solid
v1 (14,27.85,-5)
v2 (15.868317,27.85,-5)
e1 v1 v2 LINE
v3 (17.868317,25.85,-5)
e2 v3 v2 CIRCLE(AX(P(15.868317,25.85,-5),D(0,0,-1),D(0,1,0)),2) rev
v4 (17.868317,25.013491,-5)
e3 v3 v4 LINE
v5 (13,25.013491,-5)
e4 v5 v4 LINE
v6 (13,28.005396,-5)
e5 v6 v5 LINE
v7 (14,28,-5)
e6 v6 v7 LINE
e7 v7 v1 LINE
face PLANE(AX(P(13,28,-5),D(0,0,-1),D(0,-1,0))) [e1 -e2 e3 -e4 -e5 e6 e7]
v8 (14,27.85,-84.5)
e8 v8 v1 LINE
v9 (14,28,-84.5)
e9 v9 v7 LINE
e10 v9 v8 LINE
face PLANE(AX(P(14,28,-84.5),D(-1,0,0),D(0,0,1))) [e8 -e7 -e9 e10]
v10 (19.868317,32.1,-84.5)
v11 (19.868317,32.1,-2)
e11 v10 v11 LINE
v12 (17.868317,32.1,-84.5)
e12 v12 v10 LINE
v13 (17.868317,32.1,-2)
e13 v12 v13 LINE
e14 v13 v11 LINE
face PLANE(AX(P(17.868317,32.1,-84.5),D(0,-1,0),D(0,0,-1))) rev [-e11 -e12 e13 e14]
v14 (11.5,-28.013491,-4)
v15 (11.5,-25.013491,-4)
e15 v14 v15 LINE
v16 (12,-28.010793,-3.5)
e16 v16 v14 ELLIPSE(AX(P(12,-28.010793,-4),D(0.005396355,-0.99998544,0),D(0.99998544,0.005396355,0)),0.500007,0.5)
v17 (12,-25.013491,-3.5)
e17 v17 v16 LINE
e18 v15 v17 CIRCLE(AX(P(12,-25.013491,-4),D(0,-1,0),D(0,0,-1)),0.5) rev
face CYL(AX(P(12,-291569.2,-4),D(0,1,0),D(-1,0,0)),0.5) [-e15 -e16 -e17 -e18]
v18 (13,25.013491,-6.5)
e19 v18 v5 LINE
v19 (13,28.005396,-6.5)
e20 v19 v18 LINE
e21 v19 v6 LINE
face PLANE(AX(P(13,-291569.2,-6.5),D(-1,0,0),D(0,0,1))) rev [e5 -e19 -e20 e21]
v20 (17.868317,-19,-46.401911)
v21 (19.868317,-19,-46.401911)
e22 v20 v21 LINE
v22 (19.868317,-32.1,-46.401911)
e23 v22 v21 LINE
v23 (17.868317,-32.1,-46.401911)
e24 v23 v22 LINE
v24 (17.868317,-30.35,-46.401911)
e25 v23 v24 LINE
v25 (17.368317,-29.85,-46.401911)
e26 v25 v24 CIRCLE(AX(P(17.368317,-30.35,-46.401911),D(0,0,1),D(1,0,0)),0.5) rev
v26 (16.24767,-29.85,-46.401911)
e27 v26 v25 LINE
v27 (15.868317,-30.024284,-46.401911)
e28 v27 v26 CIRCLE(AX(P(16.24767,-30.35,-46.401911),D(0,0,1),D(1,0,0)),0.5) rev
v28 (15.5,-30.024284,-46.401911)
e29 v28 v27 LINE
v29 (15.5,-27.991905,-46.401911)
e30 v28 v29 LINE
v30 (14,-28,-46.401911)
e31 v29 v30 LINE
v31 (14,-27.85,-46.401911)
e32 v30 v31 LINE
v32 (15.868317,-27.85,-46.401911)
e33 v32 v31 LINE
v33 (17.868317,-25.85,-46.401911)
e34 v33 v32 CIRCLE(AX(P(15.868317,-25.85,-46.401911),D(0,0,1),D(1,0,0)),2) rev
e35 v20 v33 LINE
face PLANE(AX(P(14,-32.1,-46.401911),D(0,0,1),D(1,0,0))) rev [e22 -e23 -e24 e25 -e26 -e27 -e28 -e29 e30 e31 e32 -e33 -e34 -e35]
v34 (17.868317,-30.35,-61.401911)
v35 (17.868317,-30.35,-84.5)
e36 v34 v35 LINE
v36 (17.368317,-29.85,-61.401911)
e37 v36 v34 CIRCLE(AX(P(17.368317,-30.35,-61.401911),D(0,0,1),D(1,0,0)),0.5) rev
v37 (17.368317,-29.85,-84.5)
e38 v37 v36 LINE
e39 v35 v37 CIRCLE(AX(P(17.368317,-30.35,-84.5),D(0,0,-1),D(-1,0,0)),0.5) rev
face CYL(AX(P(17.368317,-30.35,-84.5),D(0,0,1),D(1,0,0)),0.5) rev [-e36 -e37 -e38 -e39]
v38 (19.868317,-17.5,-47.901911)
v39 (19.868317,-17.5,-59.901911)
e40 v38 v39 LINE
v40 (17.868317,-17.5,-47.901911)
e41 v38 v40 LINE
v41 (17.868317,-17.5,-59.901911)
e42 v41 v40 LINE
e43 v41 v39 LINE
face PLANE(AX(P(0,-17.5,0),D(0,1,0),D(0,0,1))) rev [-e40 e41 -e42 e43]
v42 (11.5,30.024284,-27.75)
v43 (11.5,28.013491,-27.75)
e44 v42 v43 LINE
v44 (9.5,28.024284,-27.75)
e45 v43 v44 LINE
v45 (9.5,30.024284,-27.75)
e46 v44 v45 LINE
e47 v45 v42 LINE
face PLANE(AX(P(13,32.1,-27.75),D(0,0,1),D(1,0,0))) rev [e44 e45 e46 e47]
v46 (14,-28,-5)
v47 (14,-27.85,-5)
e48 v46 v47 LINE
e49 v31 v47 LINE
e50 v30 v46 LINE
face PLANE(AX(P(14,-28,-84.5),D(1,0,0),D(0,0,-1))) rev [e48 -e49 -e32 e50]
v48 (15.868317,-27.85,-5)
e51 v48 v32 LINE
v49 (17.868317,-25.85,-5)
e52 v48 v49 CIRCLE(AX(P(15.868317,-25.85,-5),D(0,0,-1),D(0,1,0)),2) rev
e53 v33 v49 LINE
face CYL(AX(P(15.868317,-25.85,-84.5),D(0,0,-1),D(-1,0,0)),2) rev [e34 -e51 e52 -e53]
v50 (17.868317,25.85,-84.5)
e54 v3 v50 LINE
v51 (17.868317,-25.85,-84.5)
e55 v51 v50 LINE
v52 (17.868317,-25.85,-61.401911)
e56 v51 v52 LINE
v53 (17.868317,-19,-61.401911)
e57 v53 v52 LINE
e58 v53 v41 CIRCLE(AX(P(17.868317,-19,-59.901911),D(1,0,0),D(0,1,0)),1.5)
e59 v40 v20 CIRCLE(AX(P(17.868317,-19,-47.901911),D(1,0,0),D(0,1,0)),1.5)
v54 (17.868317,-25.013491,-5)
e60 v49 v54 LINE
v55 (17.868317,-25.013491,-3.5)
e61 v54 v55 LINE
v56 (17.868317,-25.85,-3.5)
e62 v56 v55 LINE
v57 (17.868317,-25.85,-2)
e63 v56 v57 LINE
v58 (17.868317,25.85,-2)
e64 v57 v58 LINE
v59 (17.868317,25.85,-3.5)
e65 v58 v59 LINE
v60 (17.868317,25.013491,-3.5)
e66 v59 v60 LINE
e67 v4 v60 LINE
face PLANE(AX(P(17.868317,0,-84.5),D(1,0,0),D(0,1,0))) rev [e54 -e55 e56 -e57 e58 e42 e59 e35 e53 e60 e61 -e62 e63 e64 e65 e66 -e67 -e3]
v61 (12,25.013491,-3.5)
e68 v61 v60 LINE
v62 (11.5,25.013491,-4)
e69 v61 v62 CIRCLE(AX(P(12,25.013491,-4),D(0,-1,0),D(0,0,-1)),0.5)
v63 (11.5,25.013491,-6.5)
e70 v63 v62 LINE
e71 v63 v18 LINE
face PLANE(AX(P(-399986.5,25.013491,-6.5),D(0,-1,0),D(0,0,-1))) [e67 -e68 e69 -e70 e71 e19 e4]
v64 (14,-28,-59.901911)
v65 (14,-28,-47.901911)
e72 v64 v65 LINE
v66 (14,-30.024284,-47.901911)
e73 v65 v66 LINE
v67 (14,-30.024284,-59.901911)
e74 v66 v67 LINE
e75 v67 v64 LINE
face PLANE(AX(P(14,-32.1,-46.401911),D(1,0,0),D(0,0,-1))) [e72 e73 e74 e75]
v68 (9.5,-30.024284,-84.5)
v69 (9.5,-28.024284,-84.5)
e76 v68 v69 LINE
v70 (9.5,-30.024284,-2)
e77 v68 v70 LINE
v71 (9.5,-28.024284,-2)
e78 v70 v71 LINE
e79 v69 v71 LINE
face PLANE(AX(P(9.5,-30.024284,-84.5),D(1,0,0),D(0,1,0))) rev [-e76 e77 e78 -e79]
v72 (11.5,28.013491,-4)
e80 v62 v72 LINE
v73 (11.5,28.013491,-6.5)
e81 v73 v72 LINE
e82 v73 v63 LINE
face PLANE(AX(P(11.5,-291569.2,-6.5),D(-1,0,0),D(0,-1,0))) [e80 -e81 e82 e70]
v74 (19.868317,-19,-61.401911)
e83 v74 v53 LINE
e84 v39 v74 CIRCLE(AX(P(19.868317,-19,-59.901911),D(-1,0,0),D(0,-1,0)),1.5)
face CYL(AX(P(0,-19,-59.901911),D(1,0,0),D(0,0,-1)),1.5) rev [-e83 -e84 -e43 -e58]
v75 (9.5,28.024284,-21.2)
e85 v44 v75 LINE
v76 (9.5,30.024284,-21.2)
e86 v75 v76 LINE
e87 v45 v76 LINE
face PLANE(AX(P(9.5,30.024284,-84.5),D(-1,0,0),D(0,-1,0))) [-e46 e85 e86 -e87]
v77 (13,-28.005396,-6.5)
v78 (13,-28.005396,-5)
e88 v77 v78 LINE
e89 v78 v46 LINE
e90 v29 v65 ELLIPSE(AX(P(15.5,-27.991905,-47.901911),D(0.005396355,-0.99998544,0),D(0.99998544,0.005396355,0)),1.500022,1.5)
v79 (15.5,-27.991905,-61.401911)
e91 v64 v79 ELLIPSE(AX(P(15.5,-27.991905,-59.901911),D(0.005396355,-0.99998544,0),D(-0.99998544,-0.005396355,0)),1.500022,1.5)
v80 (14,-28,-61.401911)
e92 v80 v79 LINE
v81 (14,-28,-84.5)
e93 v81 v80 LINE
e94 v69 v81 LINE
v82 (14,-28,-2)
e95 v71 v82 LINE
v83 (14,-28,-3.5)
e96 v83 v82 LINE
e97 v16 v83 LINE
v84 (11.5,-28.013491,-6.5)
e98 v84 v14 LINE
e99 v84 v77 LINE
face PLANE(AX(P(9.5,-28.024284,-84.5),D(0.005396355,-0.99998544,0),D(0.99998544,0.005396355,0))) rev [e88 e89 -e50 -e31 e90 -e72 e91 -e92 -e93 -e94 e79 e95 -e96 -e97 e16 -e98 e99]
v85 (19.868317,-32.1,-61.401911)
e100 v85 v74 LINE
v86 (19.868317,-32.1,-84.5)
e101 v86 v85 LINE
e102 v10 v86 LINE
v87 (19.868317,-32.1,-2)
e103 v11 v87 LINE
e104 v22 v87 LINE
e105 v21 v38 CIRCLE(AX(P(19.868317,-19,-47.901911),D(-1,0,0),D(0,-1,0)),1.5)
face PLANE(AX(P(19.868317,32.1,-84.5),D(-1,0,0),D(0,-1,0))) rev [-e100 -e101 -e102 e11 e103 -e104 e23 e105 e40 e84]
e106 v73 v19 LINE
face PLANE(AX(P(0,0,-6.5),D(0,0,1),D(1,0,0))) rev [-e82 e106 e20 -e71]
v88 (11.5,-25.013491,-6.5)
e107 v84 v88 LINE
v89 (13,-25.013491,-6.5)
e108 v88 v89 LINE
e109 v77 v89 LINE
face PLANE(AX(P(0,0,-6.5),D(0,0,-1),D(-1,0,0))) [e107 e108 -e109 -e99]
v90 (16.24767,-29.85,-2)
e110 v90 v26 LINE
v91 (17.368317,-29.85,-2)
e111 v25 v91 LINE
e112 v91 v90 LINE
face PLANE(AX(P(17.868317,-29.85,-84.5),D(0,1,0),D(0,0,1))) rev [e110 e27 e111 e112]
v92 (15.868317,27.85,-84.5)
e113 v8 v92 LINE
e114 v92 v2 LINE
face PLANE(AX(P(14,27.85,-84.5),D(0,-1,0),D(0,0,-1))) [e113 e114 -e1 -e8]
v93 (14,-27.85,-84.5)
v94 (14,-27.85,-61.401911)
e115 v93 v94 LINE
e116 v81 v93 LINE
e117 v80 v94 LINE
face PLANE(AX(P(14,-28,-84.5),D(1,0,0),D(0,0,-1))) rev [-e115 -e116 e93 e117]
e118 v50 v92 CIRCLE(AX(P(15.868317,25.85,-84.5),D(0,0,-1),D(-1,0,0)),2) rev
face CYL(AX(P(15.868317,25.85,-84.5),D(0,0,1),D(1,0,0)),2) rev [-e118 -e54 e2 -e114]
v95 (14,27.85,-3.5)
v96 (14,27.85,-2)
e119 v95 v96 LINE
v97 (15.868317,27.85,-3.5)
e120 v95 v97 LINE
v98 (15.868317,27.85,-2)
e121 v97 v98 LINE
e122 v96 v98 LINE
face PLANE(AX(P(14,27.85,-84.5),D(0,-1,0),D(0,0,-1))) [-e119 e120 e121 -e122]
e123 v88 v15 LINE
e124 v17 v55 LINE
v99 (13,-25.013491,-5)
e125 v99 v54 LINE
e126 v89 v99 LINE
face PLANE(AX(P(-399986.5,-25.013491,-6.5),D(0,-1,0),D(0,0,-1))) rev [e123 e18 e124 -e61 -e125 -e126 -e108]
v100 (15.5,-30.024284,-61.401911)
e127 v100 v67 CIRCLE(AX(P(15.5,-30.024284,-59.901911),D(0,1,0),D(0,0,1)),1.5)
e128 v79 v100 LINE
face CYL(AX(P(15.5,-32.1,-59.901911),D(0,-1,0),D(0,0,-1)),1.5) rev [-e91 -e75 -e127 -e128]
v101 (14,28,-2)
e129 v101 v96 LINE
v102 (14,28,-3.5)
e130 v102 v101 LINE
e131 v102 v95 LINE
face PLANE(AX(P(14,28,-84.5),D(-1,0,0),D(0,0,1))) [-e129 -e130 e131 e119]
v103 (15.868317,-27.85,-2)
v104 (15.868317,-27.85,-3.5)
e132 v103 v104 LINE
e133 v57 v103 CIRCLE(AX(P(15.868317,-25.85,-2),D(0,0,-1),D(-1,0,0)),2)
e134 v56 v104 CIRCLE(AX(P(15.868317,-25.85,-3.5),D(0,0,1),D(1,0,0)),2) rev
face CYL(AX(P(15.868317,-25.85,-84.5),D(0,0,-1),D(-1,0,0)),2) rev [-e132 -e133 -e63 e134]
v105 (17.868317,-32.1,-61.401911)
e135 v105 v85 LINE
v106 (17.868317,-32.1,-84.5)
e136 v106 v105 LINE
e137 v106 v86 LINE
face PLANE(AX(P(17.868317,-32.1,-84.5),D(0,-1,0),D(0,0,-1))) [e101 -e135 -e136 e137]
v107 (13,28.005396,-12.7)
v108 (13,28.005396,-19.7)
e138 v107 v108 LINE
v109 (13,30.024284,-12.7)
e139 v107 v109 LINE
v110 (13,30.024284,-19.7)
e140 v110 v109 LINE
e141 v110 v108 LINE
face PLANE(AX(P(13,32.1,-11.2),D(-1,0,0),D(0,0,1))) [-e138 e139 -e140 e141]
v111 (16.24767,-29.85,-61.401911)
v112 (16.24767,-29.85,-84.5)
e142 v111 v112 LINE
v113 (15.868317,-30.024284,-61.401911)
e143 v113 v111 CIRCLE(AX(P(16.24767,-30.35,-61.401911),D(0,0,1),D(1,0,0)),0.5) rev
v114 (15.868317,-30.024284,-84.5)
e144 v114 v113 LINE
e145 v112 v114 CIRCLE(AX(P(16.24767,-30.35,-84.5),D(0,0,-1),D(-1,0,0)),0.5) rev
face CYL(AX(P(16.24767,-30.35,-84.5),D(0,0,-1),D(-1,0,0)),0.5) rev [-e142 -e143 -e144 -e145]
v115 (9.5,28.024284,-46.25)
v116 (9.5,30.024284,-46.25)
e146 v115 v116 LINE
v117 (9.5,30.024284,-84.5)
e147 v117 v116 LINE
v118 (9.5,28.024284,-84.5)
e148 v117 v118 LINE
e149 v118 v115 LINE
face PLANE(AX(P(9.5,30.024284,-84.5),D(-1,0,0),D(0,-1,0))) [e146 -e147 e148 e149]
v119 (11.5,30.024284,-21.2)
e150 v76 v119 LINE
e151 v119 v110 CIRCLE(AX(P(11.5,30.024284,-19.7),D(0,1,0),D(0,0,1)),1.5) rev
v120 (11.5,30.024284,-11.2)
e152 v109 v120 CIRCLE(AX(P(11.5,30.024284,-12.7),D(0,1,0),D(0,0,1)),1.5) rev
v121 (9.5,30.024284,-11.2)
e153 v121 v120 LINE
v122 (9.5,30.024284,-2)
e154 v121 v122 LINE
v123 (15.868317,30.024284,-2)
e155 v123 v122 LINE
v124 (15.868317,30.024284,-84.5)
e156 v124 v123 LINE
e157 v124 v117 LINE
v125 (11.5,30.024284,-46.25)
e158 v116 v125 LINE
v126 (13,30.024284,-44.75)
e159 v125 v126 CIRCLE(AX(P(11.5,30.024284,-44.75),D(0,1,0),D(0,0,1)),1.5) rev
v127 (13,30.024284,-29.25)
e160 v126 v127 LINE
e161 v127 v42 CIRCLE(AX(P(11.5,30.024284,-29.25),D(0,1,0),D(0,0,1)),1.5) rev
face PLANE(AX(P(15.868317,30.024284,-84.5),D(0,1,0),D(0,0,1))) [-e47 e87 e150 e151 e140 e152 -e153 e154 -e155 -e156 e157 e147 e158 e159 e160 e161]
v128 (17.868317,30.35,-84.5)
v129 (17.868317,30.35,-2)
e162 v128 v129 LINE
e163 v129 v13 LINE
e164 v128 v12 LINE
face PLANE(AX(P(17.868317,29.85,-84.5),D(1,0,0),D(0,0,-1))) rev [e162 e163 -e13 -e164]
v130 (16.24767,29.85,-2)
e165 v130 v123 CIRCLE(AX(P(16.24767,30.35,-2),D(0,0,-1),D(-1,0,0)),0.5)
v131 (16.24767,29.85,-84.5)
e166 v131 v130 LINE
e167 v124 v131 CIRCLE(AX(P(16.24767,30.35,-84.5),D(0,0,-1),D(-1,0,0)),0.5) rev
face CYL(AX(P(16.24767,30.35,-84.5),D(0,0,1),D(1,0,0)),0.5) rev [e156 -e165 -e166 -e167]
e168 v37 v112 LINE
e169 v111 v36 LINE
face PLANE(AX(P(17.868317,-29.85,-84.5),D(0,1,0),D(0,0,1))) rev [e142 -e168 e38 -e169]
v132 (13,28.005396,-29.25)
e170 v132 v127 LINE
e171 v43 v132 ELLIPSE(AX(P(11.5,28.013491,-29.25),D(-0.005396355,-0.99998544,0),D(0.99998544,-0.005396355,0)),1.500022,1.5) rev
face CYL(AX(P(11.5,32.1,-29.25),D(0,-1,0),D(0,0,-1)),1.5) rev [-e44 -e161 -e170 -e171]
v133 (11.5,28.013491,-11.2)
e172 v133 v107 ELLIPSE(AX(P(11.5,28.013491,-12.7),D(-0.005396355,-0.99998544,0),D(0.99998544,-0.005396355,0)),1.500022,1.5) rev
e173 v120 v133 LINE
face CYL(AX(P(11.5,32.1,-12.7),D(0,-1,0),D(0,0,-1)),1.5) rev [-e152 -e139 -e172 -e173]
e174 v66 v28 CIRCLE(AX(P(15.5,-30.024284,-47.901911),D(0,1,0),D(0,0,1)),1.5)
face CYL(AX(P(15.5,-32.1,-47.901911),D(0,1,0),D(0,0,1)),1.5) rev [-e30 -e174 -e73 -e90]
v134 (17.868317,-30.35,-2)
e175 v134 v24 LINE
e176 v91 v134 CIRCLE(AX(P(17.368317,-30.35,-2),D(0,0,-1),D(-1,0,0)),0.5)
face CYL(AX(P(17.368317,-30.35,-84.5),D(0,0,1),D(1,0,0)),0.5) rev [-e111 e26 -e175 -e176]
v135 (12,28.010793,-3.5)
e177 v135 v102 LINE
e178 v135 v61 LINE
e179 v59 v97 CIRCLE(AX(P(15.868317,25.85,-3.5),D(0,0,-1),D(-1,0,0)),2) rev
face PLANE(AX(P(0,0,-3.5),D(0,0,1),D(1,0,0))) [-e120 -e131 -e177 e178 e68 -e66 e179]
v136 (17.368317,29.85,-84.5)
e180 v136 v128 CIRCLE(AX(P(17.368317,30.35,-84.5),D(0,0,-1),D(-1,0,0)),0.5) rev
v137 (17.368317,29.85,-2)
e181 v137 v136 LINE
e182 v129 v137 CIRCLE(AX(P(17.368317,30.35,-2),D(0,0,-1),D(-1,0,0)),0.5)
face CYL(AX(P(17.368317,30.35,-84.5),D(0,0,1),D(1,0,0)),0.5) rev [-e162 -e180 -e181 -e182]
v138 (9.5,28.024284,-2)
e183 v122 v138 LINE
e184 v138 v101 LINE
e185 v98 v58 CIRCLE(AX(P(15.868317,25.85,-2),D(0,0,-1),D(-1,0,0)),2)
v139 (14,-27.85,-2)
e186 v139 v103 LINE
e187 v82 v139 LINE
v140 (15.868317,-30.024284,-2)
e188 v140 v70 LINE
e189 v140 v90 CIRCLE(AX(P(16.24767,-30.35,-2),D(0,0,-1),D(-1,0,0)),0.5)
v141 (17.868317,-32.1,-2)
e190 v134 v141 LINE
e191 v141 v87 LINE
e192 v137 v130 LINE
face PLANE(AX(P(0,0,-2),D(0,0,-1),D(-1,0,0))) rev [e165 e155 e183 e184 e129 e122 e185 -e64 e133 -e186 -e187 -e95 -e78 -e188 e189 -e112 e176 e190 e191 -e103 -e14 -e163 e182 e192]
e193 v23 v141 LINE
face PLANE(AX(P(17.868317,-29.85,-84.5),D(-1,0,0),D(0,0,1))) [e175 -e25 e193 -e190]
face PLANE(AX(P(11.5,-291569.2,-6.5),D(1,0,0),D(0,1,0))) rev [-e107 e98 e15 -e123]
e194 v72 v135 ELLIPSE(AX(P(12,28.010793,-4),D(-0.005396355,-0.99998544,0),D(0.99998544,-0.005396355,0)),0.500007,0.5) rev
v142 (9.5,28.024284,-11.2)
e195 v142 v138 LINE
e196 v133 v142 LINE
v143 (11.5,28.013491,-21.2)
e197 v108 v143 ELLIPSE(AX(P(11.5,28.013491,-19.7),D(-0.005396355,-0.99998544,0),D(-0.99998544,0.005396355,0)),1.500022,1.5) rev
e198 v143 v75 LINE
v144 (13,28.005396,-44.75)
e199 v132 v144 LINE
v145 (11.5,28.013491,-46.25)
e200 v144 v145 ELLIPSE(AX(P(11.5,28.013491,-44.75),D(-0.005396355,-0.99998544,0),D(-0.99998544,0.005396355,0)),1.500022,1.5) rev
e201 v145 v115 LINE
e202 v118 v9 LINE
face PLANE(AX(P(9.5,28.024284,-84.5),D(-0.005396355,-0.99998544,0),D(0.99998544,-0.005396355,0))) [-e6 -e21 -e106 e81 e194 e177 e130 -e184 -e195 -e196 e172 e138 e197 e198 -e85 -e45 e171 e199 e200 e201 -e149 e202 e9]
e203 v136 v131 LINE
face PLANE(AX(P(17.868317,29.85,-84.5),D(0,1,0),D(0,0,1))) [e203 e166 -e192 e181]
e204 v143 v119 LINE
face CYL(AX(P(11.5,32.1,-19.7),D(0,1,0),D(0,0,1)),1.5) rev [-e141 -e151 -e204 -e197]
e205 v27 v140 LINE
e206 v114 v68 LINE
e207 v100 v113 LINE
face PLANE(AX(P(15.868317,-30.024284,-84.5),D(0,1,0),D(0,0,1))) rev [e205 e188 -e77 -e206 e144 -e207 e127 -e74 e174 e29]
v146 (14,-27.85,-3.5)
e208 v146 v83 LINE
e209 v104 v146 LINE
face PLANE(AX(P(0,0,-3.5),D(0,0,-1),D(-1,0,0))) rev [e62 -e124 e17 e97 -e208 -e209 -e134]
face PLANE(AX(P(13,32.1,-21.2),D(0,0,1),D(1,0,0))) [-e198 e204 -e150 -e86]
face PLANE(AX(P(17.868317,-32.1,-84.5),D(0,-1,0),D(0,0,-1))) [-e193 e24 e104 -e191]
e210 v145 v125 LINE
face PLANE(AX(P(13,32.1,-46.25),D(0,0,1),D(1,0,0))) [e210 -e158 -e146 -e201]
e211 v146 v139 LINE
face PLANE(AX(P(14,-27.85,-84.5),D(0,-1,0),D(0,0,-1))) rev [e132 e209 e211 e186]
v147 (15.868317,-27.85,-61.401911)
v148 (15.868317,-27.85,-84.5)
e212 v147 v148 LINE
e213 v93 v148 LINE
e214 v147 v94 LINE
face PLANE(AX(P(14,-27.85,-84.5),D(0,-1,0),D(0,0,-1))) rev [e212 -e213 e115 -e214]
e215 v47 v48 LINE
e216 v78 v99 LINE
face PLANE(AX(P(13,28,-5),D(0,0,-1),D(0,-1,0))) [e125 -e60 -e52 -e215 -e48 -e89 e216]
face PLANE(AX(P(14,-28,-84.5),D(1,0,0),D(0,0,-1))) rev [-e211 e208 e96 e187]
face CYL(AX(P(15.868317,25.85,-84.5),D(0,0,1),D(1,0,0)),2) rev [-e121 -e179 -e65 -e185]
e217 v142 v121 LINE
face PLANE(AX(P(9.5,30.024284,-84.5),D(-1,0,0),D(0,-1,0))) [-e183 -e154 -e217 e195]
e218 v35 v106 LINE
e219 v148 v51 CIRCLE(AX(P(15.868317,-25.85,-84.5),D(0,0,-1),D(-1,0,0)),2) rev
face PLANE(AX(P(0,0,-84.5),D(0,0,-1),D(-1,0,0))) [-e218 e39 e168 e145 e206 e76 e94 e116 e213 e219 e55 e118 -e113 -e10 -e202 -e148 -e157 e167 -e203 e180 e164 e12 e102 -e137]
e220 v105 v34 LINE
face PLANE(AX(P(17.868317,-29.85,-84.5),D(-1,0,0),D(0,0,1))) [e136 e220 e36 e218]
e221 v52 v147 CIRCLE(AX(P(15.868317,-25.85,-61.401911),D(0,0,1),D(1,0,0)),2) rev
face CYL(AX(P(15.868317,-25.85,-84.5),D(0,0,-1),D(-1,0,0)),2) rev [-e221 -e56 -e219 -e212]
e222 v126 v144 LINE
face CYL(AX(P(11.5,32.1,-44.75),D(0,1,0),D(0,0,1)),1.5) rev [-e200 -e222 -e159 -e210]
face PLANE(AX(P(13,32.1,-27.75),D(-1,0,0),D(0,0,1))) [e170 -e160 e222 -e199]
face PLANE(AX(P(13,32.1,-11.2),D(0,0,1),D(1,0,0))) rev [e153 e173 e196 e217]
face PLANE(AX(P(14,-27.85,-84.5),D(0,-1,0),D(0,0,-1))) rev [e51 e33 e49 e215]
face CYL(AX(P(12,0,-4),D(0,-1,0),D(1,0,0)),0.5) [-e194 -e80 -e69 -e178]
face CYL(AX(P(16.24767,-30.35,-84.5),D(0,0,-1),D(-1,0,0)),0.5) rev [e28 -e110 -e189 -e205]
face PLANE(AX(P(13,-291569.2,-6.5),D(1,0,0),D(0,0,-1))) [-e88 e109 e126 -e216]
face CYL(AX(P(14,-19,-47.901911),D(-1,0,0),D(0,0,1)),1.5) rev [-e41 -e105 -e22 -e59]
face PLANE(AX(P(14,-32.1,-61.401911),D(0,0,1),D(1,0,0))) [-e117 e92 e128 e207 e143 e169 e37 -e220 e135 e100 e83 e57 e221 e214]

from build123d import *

# Parameters (mm, degrees)
BOSS_EXTRUDE1_START  = -82.5
BOSS_EXTRUDE1_DEPTH  = 82.5
SKETCH2_W            = 8.569638255
SKETCH2_H            = 10
SKETCH2_H_2          = 18.5
CUT_EXTRUDE1_DEPTH   = 93.549500309
FILLET2_R            = 2
FILLET3_R            = 0.5
CUT_EXTRUDE2_START   = -17.5
SKETCH2_3_W          = 11.636747081
SKETCH2_3_H          = 15
CUT_EXTRUDE2_DEPTH   = 76.049500309
FILLET1_R            = 1.5
BOSS_EXTRUDE3_START  = -3.5
BOSS_EXTRUDE3_DEPTH  = 3
BOSS_EXTRUDE4_START  = -5
BOSS_EXTRUDE4_DEPTH  = 1.5
FILLET5_R            = 0.5
FILLET5_OF_MIRROR4_R = 0.5


# Read off the part's stored shape, not the designer's step: Boss-Extrude1
with BuildPart() as part:
    # Boss-Extrude1 outline → Boss-Extrude1 (new body)
    with BuildSketch(Plane.XY.offset(-2).offset(BOSS_EXTRUDE1_START)):
        Polygon((17.868316672, 32.1), (17.868316672, 29.85), (15.868316672, 29.85), (15.868316672, 30.024283949), (9.5, 30.024283949), (9.5, 28.024283949), (14, 28), (14, 27.85), (17.868316672, 27.85), (17.868316672, 0), (19.868316672, 0), (19.868316672, 32.1), align=None)
    boss_extrude1 = extrude(amount=BOSS_EXTRUDE1_DEPTH)

    # Mirror1: Boss-Extrude1 across plane
    add(boss_extrude1.mirror(Plane.ZX))

    # Sketch2 → Cut-Extrude1 (cut, through all)
    with BuildSketch(Plane(origin=(0, 0, 0), x_dir=(1, 0, 0), z_dir=(0, 1, 0))):
        with Locations((8.715180872, 16.2)):
            Rectangle(SKETCH2_W, SKETCH2_H)
        with Locations((8.715180872, 37)):
            Rectangle(SKETCH2_W, SKETCH2_H_2)
    extrude(amount=CUT_EXTRUDE1_DEPTH, mode=Mode.SUBTRACT)

    # Fillet2
    fillet2_edges = [part.edges().sort_by_distance(p)[0] for p in [
        (17.868316672, 27.85, -43.25),
        (17.868316672, -27.85, -43.25),
    ]]
    fillet(fillet2_edges, radius=FILLET2_R)

    # Fillet3
    # the kernel refuses this fillet: 0.5 mm, written as the material it adds along each edge
    with BuildSketch(Plane(origin=(15.868316672, -29.85, -84.5), x_dir=(0, -1, 0), z_dir=(0, 0, 1))) as fillet3_piece_1:
        with BuildLine():
            CenterArc((0.5, 0.379353469), FILLET3_R, 180, 49.350336553)
            Line((0, 0.379353469), (-0.01, 0.379353469))
            Line((-0.01, 0.379353469), (-0.01, 0))
            Line((-0.01, 0), (0, -0.01))
            ThreePointArc((0, -0.01), (0.087141974, -0.01), (0.167769628, -0.007587069))
            Line((0.167769628, -0.007587069), (0.174283949, 0))
        make_face()
    extrude(amount=82.5)
    with BuildSketch(Plane(origin=(17.868316672, -29.85, -84.5), x_dir=(-1, 0, 0), z_dir=(0, 0, 1))) as fillet3_piece_2:
        with BuildLine():
            CenterArc((FILLET3_R, FILLET3_R), FILLET3_R, 180, 90)
            Line((0, FILLET3_R), (-FILLET3_R * 0.02, FILLET3_R))
            Line((-FILLET3_R * 0.02, FILLET3_R), (-FILLET3_R * 0.02, -FILLET3_R * 0.02))
            Line((-FILLET3_R * 0.02, -FILLET3_R * 0.02), (FILLET3_R, -FILLET3_R * 0.02))
            Line((FILLET3_R, -FILLET3_R * 0.02), (FILLET3_R, 0))
        make_face()
    extrude(amount=82.5)
    with BuildSketch(Plane(origin=(17.868316672, 29.85, -84.5), x_dir=(-1, 0, 0), z_dir=(0, 0, 1))) as fillet3_piece_3:
        with BuildLine():
            CenterArc((FILLET3_R, -FILLET3_R), FILLET3_R, 90, 90)
            Line((0, -FILLET3_R), (-FILLET3_R * 0.02, -FILLET3_R))
            Line((-FILLET3_R * 0.02, -FILLET3_R), (-FILLET3_R * 0.02, FILLET3_R * 0.02))
            Line((-FILLET3_R * 0.02, FILLET3_R * 0.02), (FILLET3_R, FILLET3_R * 0.02))
            Line((FILLET3_R, FILLET3_R * 0.02), (FILLET3_R, 0))
        make_face()
    extrude(amount=82.5)
    with BuildSketch(Plane(origin=(15.868316672, 29.85, -84.5), x_dir=(0, 1, 0), z_dir=(0, 0, 1))) as fillet3_piece_4:
        with BuildLine():
            CenterArc((0.5, -0.379353469), FILLET3_R, 130.649663447, 49.350336553)
            Line((0, -0.379353469), (-0.01, -0.379353469))
            Line((-0.01, -0.379353469), (-0.01, 0))
            Line((-0.01, 0), (0, 0.01))
            ThreePointArc((0, 0.01), (0.087141974, 0.01), (0.167769628, 0.007587069))
            Line((0.167769628, 0.007587069), (0.174283949, 0))
        make_face()
    extrude(amount=82.5)

    # Sketch2<3> → Cut-Extrude2 (cut, through all)
    with BuildSketch(Plane(origin=(0, 0, 0), x_dir=(1, 0, 0), z_dir=(0, 1, 0)).offset(CUT_EXTRUDE2_START)):
        with Locations((19.818373541, 53.901910681)):
            Rectangle(SKETCH2_3_W, SKETCH2_3_H)
    extrude(amount=-CUT_EXTRUDE2_DEPTH, mode=Mode.SUBTRACT)

    # Fillet1
    fillet1_edges = [part.edges().sort_by_distance(p)[0] for p in [
        (18.868316672, -17.5, -46.401910681),
        (14, -29.012141975, -46.401910681),
        (14, -29.012141975, -61.401910681),
        (18.868316672, -17.5, -61.401910681),
        (13, 29.014840191, -11.2),
        (13, 29.014840191, -21.2),
        (13, 29.014840191, -27.75),
        (13, 29.014840191, -46.25),
    ]]
    fillet(fillet1_edges, radius=FILLET1_R)

    # Sketch3 → Boss-Extrude3 (add)
    with BuildSketch(Plane.XY.offset(BOSS_EXTRUDE3_START)):
        Polygon((11.5, 28.013491083), (13, 28.005396433), (13, 25.013491083), (11.5, 25.013491083), align=None)
    boss_extrude3 = extrude(amount=-BOSS_EXTRUDE3_DEPTH)

    # Sketch3<6> → Boss-Extrude4 (add)
    with BuildSketch(Plane.XY.offset(BOSS_EXTRUDE4_START)):
        Polygon((13, 28.005396433), (17.868316672, 27.979124888), (17.868316672, 25.013491083), (13, 25.013491083), align=None)
    boss_extrude4 = extrude(amount=BOSS_EXTRUDE4_DEPTH)

    # Fillet5
    fillet5_edges = [part.edges().sort_by_distance(p)[0] for p in [
        (11.5, 26.513491083, -3.5),
    ]]
    fillet(fillet5_edges, radius=FILLET5_R)

    # Mirror4: Boss-Extrude3, Boss-Extrude4 across plane
    add(boss_extrude3.mirror(Plane.ZX))
    add(boss_extrude4.mirror(Plane.ZX))

    # Fillet5 of Mirror4
    fillet5_of_mirror4_edges = [part.edges().sort_by_distance(p)[0] for p in [
        (11.5, -26.513491083, -3.5),
    ]]
    fillet(fillet5_of_mirror4_edges, radius=FILLET5_OF_MIRROR4_R)


solid = part.part
